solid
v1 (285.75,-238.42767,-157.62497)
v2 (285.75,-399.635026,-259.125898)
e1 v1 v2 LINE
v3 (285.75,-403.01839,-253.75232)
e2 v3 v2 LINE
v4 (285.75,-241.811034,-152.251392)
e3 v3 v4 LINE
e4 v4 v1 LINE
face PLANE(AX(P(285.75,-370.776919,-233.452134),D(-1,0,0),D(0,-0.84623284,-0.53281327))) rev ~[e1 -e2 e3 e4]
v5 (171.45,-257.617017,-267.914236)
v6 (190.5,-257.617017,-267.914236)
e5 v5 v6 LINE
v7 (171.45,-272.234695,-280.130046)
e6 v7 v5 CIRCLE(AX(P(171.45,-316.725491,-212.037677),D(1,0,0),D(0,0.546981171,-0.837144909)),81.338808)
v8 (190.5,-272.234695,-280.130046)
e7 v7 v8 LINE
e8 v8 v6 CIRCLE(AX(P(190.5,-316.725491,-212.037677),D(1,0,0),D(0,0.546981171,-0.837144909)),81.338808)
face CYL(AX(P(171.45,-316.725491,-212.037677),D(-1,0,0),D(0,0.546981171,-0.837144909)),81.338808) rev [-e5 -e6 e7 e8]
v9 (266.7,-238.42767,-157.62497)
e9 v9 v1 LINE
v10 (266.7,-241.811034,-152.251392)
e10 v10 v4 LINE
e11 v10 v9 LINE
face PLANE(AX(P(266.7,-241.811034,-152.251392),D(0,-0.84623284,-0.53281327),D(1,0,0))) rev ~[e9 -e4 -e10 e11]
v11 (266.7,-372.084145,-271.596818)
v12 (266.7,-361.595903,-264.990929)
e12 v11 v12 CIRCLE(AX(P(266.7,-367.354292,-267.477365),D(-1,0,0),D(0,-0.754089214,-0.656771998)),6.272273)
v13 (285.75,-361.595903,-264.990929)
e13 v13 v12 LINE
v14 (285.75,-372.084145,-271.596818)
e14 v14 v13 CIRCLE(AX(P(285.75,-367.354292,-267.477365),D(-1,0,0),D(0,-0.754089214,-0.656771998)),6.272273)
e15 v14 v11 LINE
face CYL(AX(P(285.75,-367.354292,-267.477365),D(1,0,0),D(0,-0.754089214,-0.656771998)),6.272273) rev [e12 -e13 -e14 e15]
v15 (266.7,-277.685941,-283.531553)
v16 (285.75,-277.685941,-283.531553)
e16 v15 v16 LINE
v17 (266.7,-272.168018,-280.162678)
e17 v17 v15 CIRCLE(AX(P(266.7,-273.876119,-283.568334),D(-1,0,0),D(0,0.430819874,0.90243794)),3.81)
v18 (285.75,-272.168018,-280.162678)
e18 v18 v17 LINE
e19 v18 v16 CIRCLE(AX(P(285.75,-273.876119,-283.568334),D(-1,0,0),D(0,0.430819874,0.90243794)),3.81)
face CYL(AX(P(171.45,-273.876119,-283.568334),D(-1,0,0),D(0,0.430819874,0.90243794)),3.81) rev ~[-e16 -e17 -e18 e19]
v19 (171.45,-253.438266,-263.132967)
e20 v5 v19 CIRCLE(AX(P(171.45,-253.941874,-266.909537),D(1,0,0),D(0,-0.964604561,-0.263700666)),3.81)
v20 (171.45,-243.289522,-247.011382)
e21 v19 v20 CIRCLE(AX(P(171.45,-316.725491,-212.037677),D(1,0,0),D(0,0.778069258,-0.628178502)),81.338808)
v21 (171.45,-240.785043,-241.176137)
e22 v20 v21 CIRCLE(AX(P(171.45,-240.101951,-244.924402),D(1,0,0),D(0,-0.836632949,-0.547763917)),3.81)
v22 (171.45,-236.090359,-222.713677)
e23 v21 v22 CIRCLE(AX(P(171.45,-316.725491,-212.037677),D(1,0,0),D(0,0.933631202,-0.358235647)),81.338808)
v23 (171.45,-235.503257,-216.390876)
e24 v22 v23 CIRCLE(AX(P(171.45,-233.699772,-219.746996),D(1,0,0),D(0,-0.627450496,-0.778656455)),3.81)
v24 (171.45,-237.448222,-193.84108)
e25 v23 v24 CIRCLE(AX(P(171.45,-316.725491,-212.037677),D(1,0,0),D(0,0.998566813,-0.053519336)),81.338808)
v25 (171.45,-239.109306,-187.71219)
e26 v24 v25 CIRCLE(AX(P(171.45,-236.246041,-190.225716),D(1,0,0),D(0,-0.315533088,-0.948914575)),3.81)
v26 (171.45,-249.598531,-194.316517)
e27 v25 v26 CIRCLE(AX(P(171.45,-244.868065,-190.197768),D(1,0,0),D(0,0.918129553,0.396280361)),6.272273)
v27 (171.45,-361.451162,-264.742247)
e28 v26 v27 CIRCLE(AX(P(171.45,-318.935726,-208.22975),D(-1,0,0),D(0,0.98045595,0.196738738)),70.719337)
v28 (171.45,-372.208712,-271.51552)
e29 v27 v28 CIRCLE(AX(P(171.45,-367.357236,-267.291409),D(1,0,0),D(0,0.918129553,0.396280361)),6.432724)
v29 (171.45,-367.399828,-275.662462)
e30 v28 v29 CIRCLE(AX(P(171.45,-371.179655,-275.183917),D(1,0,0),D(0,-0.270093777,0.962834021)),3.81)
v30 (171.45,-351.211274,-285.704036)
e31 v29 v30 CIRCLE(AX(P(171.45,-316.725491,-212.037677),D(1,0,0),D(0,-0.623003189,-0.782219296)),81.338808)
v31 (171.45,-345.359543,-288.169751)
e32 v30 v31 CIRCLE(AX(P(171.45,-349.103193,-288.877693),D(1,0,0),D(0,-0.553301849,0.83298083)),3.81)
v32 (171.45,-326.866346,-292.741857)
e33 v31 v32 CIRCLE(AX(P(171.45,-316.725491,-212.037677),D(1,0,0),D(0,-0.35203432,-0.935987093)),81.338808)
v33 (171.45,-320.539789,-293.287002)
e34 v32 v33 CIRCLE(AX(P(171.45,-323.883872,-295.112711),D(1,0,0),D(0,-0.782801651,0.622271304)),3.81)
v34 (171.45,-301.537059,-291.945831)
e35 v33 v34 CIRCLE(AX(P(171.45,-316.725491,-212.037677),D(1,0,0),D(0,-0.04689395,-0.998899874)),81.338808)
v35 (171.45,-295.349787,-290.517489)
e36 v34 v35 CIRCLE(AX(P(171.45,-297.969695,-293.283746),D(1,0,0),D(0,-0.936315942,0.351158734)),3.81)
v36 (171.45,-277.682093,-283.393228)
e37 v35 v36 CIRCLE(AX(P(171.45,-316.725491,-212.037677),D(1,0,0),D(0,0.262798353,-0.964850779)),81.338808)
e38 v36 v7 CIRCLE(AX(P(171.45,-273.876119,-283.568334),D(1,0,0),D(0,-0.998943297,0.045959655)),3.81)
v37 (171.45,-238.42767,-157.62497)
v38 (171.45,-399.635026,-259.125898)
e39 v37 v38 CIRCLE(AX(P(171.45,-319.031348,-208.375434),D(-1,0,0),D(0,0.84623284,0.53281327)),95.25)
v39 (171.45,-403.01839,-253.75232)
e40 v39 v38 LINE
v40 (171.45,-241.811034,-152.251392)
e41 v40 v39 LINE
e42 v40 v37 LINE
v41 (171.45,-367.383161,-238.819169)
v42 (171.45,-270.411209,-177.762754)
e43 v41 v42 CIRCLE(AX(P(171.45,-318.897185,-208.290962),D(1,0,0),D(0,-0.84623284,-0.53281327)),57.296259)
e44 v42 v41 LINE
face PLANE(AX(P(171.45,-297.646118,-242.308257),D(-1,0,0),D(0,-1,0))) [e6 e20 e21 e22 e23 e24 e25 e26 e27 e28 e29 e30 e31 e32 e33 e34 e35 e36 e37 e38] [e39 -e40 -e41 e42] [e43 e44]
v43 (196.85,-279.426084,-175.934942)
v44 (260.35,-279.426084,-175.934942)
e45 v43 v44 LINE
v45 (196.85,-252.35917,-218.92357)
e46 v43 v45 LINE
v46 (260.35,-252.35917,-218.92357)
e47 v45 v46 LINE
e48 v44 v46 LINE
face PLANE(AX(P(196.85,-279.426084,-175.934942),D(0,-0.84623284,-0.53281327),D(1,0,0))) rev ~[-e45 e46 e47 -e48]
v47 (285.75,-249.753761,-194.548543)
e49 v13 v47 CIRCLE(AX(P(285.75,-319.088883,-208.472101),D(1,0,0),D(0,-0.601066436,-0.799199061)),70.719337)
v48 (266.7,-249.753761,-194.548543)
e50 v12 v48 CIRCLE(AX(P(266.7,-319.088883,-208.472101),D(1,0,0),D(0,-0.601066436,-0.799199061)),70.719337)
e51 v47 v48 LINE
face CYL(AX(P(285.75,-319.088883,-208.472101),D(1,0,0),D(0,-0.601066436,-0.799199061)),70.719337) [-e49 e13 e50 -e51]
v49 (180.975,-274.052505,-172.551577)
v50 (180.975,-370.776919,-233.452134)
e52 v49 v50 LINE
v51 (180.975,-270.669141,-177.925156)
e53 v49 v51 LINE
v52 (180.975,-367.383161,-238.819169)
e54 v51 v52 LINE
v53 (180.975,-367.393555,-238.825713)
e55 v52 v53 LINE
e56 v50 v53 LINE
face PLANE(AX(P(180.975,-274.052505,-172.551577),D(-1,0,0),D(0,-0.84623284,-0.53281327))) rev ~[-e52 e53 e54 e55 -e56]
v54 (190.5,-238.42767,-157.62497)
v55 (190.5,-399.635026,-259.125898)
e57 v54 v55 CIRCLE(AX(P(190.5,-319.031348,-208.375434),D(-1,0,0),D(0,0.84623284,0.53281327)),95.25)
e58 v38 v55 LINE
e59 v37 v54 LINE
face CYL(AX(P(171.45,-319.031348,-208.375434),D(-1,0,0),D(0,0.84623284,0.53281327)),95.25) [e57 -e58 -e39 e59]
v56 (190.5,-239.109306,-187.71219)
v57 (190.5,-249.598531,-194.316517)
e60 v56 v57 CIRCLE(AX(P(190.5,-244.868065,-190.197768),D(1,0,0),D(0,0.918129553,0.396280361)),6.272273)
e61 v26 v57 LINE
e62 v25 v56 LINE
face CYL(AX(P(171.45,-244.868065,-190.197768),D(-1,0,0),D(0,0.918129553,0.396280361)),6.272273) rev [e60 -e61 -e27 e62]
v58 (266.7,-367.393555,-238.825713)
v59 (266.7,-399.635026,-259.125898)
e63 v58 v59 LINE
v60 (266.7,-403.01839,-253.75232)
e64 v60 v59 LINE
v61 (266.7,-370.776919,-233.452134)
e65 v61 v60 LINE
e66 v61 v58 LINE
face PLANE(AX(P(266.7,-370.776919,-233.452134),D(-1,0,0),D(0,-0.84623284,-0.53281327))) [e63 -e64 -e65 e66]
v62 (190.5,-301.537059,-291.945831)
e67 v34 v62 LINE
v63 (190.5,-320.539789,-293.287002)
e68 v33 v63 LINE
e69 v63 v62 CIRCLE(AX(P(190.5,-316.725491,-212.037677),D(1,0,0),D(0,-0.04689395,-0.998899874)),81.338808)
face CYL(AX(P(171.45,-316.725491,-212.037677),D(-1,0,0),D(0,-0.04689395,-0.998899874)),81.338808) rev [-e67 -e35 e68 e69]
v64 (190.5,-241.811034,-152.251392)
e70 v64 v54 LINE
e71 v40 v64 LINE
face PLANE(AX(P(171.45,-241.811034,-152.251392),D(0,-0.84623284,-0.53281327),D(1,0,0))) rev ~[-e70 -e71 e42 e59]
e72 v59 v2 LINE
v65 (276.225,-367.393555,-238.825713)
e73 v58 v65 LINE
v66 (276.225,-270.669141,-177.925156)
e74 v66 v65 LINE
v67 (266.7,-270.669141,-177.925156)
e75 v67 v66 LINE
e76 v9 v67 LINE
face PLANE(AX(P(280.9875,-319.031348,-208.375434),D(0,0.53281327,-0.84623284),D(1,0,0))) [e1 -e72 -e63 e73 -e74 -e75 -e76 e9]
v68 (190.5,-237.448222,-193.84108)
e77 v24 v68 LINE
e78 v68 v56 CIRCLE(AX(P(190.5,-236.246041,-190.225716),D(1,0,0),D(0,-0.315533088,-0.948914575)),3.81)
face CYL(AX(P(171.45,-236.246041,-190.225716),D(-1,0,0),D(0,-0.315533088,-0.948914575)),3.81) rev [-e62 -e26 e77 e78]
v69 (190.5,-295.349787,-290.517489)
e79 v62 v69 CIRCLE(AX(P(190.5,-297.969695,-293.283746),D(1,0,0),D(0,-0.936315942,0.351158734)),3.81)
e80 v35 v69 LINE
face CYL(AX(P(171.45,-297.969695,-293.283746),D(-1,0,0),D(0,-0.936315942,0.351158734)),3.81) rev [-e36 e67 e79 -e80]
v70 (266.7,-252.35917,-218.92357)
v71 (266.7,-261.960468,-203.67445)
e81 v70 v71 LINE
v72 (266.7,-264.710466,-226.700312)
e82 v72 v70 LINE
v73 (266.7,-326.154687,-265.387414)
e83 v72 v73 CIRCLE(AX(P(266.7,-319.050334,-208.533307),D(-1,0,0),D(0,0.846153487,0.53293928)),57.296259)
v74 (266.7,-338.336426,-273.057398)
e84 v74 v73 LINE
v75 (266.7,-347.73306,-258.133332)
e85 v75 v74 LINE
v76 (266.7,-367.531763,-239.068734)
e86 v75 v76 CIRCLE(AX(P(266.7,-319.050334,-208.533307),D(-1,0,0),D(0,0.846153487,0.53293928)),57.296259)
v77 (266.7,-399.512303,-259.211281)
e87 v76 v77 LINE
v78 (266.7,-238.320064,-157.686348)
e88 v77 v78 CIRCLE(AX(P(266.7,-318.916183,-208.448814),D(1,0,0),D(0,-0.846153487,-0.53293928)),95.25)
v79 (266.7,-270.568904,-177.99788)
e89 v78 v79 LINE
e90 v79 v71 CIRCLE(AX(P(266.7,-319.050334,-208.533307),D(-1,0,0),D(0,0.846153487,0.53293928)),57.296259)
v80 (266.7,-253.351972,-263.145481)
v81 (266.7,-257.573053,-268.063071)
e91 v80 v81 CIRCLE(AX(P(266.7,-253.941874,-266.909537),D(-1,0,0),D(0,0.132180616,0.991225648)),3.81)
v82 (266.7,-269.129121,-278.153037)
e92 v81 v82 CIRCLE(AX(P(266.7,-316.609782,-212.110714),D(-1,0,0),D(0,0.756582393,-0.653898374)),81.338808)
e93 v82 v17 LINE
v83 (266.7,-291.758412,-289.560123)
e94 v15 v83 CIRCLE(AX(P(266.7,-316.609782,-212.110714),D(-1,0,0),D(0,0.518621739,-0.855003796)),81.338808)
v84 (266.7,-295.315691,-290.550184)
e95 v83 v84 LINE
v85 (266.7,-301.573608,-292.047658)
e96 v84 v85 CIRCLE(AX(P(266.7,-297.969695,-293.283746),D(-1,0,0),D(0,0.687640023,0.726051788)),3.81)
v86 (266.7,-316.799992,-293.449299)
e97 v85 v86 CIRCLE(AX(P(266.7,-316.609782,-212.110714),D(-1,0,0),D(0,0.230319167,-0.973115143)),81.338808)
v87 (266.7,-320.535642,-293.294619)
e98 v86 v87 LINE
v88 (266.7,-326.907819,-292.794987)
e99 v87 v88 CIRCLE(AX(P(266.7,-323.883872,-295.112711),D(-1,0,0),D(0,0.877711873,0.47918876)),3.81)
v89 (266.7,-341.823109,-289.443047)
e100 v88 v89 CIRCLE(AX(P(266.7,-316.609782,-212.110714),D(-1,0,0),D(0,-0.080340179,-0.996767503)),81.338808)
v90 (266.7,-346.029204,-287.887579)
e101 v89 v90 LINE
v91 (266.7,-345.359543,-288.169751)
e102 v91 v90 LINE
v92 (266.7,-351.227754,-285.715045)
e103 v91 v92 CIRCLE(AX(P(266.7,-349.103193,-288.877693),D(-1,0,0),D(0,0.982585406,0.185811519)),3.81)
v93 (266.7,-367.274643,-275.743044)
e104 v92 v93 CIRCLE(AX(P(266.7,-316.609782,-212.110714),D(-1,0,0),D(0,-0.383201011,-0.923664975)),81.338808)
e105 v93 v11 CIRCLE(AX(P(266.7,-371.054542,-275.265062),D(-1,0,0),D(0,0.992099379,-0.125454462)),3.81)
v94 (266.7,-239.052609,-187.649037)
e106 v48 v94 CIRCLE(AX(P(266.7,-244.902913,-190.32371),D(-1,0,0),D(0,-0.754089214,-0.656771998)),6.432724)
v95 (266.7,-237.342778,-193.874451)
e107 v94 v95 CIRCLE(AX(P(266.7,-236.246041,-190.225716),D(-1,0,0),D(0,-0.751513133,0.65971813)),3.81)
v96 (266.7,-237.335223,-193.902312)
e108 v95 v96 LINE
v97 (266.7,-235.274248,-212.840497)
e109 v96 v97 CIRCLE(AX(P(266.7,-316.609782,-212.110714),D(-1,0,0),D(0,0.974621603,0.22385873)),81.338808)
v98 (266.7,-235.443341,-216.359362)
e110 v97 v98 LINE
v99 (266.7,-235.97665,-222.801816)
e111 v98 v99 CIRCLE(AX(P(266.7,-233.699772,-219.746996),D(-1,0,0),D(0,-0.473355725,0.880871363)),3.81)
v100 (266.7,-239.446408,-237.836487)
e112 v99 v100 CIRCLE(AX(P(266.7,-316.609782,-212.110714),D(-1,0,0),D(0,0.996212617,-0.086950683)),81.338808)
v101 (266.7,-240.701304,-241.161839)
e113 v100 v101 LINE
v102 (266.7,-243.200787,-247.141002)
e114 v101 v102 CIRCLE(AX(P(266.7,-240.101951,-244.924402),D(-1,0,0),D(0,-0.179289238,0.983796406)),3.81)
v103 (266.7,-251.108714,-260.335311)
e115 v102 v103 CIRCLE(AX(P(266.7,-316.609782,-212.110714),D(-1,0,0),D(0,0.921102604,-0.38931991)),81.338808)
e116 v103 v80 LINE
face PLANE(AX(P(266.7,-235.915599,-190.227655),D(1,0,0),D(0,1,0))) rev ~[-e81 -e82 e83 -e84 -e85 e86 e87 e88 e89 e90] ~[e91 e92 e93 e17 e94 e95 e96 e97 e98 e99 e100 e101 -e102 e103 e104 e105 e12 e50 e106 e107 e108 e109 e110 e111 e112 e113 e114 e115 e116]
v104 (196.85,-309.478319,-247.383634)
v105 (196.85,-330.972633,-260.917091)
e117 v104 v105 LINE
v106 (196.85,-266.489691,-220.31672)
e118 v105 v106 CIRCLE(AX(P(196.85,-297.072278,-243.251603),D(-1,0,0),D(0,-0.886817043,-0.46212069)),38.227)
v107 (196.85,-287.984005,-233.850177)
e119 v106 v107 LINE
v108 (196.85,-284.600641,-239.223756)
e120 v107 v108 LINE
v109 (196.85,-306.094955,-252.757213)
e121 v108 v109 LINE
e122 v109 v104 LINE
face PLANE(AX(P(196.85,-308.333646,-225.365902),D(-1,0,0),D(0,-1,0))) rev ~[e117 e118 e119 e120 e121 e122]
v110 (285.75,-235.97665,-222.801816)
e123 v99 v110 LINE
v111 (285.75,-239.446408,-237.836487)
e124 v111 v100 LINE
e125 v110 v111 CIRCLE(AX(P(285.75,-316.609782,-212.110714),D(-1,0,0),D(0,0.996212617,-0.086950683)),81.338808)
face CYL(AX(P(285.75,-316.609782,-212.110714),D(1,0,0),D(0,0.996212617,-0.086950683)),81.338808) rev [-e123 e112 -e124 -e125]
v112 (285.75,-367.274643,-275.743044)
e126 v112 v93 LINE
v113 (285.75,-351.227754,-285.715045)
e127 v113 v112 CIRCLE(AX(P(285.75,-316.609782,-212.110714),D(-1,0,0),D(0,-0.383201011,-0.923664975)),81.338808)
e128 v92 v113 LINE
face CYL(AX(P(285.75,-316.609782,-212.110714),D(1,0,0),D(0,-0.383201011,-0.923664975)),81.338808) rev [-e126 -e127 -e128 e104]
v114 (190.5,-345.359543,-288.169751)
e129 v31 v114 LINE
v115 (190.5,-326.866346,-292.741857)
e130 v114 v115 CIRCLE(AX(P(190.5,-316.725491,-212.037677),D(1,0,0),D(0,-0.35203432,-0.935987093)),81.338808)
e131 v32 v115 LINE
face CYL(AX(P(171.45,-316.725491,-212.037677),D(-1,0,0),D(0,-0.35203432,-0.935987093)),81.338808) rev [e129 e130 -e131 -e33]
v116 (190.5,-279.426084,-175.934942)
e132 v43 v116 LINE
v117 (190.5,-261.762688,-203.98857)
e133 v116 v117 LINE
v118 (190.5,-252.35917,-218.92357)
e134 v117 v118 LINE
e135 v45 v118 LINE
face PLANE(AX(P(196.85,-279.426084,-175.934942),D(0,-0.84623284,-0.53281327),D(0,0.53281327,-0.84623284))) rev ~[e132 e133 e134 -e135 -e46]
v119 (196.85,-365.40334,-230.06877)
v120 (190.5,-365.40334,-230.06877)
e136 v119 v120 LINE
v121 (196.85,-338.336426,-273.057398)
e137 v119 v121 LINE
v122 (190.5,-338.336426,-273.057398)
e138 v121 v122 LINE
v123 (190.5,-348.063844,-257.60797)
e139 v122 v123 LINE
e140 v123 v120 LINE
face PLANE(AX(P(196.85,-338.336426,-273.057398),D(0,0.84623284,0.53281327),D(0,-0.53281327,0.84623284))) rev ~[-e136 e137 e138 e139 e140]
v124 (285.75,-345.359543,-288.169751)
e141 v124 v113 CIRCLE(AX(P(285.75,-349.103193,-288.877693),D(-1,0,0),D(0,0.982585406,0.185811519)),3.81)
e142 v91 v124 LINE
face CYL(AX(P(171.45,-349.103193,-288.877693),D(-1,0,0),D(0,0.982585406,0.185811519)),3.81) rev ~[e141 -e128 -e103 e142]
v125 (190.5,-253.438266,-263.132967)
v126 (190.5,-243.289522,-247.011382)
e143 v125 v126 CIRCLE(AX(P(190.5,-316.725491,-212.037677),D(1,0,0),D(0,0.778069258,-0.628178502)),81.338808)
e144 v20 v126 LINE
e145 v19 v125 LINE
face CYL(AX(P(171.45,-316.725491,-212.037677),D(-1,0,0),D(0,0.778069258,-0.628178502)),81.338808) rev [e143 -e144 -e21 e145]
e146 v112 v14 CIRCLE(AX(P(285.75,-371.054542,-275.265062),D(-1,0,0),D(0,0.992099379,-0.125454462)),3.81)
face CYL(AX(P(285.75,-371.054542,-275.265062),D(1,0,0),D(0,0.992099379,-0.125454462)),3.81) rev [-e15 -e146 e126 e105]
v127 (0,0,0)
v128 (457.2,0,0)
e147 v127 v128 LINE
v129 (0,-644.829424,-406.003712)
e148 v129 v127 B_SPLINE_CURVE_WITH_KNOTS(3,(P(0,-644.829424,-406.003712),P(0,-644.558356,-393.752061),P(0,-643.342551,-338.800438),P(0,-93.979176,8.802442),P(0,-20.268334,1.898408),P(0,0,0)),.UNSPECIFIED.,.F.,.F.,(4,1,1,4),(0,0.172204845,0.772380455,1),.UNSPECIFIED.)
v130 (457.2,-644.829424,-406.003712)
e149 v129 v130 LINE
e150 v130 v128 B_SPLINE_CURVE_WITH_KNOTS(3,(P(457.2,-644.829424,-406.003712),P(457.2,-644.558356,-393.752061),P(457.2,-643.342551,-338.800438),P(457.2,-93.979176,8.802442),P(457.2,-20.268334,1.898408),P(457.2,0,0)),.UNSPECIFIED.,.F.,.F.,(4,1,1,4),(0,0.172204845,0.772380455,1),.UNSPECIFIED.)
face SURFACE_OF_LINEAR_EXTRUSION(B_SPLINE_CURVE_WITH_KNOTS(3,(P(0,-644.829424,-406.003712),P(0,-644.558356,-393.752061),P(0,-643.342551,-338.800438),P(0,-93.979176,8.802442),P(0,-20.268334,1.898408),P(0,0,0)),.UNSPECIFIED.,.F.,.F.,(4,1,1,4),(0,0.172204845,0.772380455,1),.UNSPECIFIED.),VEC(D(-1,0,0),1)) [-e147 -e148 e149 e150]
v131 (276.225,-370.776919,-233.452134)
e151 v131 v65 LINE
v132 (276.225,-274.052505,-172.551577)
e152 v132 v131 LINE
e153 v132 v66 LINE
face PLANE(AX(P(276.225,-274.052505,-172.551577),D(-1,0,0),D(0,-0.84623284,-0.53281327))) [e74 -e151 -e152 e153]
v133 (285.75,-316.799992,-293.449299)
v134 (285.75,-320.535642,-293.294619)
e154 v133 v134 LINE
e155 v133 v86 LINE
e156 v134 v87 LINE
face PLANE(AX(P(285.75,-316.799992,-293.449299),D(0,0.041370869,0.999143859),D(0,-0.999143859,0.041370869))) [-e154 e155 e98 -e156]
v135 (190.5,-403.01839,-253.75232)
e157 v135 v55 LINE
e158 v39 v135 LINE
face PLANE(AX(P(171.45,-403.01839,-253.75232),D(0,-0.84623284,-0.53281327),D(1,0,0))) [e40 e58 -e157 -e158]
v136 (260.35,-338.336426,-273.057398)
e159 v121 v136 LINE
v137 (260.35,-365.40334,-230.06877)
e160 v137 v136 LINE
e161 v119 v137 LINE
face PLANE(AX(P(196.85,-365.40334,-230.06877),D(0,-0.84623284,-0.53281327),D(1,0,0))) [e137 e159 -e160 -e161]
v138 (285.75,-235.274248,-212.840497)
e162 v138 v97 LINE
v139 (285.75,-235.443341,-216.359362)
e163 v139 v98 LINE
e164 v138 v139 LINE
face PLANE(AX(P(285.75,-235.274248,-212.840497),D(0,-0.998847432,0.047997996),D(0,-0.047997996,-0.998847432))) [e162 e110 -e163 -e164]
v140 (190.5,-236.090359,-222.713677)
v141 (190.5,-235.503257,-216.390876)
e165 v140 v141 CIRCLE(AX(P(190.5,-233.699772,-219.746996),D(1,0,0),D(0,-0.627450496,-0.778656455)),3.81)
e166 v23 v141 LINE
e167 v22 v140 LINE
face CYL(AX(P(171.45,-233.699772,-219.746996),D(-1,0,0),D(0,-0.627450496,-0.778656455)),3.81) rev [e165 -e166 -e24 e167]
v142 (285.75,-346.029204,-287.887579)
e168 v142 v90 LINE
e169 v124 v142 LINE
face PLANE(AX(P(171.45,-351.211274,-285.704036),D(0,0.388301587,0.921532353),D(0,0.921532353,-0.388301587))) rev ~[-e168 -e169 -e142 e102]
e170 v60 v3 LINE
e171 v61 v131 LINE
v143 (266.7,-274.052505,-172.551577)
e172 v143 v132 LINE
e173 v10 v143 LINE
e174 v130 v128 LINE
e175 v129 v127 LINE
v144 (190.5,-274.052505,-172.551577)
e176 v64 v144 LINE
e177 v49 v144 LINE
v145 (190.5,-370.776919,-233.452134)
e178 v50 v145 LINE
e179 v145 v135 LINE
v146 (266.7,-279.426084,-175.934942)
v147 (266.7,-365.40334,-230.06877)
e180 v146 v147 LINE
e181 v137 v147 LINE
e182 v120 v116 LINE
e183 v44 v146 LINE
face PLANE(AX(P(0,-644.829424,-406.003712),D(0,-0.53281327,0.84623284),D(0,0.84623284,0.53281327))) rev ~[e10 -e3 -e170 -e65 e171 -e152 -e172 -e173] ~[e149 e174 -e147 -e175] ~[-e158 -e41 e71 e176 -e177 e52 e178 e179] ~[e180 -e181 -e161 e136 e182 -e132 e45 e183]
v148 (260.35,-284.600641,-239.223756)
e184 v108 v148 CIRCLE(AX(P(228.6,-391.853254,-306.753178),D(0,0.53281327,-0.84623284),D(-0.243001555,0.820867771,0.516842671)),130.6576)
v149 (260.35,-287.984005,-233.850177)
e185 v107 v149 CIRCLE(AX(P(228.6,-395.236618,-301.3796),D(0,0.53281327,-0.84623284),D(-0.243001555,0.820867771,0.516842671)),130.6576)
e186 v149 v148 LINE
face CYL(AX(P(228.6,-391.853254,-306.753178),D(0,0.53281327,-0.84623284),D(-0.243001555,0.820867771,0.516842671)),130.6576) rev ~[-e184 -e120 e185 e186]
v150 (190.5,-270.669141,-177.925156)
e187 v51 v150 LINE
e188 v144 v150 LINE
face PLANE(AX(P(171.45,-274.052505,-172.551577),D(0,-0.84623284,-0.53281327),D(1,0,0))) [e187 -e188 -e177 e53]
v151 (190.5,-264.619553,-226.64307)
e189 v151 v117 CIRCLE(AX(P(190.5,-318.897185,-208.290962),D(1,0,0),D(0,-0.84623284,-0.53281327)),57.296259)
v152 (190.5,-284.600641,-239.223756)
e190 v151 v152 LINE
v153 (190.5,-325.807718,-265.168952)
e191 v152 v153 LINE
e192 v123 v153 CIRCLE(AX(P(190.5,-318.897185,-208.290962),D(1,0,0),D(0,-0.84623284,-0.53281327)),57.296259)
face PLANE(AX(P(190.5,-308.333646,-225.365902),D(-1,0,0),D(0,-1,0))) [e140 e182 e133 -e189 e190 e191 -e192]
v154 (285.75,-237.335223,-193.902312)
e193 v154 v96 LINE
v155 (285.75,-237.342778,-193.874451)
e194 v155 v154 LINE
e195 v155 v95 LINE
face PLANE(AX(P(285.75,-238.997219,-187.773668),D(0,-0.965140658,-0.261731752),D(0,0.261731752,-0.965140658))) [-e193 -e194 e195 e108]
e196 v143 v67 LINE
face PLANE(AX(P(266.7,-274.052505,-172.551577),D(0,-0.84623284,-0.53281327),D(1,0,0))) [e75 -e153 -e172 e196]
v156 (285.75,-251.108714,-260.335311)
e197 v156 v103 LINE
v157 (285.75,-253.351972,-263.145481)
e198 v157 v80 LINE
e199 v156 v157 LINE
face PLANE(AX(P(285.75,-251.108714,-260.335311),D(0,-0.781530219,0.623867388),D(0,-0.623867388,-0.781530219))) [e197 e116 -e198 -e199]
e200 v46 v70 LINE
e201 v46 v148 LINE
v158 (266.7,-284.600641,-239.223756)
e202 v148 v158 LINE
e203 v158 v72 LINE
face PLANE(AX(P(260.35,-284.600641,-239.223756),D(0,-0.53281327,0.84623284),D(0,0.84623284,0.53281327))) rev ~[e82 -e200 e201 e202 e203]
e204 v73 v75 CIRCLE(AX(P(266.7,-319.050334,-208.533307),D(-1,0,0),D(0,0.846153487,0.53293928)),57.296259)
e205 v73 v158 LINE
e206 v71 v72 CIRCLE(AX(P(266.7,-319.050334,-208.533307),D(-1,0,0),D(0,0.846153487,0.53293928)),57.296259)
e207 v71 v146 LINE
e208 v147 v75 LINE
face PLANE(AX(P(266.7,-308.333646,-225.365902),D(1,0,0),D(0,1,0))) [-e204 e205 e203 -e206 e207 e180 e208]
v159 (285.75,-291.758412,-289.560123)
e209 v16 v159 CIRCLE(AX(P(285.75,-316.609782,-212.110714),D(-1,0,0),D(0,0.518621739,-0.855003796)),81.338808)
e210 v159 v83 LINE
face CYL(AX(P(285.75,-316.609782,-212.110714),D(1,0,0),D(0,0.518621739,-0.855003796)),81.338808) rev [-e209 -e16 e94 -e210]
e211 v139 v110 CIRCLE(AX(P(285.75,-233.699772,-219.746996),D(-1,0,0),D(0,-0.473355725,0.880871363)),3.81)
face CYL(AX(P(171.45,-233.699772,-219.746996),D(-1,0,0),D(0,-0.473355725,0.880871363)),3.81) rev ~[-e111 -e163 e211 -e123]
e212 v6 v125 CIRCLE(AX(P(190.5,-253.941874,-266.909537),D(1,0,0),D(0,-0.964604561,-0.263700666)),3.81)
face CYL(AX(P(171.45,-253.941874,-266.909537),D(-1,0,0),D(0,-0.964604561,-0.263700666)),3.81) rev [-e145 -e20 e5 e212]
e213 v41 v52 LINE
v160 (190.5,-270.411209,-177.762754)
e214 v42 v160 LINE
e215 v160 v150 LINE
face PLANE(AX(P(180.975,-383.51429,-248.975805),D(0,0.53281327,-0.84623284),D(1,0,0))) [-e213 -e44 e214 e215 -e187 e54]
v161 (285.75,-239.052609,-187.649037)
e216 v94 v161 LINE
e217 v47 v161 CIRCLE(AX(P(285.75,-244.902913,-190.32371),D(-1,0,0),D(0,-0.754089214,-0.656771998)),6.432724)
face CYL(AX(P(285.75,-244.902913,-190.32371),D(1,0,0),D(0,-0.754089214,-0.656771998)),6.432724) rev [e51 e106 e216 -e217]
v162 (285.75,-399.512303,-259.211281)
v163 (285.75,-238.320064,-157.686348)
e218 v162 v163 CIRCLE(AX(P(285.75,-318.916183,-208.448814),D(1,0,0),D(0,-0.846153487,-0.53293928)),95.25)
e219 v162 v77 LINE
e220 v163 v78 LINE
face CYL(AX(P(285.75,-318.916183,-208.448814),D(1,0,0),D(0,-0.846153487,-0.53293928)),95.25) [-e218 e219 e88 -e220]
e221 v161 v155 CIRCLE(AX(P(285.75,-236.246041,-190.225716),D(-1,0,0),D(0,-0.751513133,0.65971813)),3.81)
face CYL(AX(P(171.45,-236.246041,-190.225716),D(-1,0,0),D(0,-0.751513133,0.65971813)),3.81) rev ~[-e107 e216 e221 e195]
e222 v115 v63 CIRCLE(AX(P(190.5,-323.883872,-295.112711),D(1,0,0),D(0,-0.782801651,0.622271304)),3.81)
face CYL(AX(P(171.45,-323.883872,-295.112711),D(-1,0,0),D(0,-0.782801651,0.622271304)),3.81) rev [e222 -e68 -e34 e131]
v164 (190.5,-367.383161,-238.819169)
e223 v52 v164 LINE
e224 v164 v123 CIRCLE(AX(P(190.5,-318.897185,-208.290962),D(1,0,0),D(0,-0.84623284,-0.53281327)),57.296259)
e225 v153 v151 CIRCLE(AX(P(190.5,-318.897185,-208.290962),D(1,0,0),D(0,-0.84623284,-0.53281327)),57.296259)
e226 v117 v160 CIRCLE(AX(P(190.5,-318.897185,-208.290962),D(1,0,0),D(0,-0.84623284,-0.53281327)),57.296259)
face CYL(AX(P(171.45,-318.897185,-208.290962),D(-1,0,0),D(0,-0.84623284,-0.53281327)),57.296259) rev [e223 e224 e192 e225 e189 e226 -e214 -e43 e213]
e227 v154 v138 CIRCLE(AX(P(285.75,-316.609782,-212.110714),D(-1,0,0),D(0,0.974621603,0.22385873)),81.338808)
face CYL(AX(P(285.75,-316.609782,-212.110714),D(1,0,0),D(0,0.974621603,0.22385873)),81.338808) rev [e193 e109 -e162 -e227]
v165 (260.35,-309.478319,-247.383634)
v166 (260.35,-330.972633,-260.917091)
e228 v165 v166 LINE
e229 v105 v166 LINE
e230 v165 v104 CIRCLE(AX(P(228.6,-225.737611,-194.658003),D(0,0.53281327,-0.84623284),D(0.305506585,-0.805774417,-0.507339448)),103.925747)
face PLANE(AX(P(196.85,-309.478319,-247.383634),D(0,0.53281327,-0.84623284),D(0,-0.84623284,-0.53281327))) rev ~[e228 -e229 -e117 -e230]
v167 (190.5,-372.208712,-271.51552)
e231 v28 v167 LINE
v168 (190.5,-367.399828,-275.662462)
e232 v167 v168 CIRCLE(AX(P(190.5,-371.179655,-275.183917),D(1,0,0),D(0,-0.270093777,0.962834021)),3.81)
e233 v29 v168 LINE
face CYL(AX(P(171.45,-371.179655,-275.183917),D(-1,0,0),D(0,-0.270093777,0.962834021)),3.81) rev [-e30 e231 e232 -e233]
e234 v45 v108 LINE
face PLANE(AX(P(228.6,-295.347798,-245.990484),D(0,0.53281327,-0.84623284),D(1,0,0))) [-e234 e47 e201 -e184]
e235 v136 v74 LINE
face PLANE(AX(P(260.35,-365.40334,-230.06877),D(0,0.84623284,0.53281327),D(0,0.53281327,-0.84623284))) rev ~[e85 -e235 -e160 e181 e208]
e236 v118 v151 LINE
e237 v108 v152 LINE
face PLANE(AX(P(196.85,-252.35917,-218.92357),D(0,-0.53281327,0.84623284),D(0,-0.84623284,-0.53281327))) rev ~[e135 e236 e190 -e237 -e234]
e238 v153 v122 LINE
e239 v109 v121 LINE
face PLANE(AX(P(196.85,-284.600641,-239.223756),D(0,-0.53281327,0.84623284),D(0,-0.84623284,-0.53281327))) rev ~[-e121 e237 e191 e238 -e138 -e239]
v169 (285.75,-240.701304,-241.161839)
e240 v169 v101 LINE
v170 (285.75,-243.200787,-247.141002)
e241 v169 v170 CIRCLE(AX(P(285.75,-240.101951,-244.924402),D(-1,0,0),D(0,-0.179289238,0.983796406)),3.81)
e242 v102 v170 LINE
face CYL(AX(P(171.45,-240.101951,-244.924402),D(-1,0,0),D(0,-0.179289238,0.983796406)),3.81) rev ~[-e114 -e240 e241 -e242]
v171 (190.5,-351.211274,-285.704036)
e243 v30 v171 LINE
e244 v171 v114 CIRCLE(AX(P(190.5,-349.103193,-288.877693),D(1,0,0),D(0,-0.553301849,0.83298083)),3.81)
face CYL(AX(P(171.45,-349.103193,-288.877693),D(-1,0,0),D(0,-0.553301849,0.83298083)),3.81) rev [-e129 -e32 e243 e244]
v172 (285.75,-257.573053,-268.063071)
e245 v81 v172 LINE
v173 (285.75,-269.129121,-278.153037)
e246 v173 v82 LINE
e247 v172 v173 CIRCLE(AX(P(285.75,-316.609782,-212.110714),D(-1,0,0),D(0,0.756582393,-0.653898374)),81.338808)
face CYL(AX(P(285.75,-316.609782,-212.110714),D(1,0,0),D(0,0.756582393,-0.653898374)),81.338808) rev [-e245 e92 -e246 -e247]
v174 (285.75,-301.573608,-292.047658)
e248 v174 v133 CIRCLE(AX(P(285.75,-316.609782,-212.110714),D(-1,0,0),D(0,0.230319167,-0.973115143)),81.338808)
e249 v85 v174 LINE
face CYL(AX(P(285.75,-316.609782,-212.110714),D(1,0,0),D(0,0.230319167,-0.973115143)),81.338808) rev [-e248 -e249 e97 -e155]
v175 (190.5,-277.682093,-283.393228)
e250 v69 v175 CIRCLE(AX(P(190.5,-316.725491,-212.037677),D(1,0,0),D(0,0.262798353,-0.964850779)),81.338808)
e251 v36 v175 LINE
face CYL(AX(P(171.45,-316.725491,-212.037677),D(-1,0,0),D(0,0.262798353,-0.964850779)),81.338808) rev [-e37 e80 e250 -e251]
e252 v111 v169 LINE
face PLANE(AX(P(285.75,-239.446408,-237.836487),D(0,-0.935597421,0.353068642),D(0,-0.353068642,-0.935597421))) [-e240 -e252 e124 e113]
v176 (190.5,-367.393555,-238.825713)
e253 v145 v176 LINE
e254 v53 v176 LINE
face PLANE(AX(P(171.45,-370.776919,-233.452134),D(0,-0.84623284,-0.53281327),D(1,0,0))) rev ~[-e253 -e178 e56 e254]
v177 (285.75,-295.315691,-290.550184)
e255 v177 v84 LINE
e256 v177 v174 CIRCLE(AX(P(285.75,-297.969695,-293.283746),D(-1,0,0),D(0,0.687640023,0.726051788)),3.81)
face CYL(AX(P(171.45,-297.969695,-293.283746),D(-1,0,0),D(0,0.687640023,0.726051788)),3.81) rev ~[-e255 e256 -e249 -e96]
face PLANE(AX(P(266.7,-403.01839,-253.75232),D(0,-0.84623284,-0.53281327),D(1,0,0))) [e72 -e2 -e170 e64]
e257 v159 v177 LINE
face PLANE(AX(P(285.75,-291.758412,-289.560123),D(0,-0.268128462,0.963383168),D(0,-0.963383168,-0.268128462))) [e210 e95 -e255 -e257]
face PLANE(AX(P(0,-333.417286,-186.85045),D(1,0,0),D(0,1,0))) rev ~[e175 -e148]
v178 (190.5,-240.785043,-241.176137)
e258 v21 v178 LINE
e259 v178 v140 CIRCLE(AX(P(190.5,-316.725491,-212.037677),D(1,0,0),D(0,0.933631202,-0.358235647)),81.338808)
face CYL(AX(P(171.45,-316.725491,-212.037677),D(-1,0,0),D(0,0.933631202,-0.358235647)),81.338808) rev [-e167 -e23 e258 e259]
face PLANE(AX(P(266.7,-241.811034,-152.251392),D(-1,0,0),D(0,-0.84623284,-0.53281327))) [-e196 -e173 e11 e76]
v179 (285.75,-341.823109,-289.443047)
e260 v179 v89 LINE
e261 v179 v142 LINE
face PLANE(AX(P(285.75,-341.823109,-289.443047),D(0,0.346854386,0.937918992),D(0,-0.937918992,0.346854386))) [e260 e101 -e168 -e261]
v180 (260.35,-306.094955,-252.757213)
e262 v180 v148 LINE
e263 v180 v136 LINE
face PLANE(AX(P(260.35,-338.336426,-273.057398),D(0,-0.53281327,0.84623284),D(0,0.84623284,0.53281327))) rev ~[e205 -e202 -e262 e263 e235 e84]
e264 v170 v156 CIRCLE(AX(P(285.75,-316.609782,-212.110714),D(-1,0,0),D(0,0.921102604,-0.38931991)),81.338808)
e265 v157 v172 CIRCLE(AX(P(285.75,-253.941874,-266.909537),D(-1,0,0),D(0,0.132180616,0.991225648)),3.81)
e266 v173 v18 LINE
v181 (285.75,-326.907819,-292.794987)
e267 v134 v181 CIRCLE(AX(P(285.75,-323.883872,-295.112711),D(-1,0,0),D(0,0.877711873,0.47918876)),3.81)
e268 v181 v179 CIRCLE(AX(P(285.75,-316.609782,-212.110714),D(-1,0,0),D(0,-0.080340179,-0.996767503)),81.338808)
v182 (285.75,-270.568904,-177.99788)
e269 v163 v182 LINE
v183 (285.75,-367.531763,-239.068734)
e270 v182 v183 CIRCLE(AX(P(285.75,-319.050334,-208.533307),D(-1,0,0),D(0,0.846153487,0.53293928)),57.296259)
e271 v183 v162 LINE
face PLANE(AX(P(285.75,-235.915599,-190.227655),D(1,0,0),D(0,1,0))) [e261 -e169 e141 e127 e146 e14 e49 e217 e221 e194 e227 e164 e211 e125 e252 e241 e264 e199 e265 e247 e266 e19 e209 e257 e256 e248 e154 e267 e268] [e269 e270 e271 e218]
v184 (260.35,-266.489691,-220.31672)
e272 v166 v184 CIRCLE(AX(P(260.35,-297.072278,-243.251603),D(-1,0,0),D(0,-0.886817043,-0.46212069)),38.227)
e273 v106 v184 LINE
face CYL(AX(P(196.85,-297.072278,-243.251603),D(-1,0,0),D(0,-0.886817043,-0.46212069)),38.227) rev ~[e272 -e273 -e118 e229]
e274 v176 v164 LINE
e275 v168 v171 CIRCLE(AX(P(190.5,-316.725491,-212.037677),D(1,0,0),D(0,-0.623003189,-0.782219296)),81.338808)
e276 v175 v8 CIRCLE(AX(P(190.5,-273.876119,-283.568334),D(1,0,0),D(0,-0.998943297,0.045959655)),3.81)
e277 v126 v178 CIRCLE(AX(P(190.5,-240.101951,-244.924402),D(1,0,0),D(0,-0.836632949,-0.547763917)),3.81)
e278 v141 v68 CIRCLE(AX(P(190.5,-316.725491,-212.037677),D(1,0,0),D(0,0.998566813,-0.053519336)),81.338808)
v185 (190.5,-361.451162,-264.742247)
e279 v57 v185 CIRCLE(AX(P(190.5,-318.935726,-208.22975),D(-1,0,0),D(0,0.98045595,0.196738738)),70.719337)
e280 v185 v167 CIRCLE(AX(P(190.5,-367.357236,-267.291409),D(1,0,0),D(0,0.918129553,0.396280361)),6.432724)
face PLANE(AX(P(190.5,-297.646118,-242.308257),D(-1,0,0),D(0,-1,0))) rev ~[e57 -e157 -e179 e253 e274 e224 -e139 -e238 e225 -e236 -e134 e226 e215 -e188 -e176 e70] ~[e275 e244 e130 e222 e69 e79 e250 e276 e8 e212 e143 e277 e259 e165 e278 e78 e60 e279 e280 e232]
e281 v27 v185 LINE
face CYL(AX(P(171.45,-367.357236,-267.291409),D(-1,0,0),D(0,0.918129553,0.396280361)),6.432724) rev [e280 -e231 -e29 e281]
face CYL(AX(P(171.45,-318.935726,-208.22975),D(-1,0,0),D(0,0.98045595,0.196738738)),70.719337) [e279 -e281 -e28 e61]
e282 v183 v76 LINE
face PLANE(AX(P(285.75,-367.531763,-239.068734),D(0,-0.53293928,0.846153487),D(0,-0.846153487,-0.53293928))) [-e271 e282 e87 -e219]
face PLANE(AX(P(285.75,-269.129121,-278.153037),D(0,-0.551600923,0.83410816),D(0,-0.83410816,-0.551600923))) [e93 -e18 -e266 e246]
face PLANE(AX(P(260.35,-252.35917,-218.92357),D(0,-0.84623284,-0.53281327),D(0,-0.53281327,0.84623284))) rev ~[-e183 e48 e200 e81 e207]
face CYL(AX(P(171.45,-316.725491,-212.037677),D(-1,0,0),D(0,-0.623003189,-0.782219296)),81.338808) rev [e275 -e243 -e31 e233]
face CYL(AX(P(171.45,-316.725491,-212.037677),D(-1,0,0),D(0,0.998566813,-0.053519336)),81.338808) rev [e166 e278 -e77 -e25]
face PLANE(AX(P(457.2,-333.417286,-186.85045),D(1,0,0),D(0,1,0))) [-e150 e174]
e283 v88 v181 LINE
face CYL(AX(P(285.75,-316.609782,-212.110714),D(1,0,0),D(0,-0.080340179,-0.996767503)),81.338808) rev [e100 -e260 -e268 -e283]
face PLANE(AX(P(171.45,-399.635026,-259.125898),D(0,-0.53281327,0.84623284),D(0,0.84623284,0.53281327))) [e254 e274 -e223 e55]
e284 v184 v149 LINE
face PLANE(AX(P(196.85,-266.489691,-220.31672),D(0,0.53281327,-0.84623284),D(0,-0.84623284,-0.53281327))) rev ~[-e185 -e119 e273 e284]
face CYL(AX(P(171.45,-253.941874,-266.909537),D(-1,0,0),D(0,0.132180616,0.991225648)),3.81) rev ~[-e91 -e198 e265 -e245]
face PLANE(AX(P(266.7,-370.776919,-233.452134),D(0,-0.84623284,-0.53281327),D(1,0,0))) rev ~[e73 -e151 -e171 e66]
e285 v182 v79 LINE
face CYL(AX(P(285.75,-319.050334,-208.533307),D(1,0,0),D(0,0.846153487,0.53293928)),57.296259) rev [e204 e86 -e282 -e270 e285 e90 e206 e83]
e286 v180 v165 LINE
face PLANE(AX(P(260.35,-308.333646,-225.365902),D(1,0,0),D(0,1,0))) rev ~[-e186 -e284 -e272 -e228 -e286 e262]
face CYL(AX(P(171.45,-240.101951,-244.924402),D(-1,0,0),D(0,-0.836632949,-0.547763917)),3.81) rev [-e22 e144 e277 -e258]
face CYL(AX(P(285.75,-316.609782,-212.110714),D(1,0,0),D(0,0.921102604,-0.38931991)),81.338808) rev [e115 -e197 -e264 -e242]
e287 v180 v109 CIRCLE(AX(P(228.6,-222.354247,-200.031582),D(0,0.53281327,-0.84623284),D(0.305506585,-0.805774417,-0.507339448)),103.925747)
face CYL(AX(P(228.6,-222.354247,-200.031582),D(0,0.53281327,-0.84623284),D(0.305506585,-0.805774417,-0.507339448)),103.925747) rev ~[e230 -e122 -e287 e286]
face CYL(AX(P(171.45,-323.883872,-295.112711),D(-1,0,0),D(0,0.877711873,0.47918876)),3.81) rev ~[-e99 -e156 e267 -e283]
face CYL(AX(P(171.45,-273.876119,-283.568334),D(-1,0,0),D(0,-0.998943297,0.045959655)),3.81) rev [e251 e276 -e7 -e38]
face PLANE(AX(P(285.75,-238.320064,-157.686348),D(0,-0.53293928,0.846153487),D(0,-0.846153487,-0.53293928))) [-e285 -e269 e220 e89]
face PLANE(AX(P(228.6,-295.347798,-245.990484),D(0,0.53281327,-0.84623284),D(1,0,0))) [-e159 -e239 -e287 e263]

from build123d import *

# Parameters (mm, degrees)
F1_DEPTH  = 457.2
F2_W      = 63.5
F2_H      = 101.6
F3_DEPTH  = 50.8
F5_DEPTH  = 127
F7_DEPTH  = 6.35
F9_DEPTH  = 6.35
F11_DEPTH = 7.62
F12_W     = 19.05
F12_H     = 38.1
F13_DEPTH = 6.35
F14_W     = 9.525
F14_H     = 114.3
F15_DEPTH = 6.35
F17_DEPTH = 19.05
F19_DEPTH = 19.05
F21_DEPTH = 19.05
F23_DEPTH = 127


with BuildPart() as f1:
    # F0 (on Right) → F1 (new body)
    with BuildSketch(Plane.YZ):
        with BuildLine():
            Line((-644.8294241484, -406.0037115008), (0, 0))
            add(Edge.make_bspline(
                [(-644.8294241484, -406.0037115008), (-644.5583562129, -393.7520607079), (-643.3425508393, -338.8004381801), (-93.9791762847, 8.8024420181), (-20.2683336801, 1.8984081269), (0, 0)],
                knots=[0, 0, 0, 0, 0.1722048446, 0.7723804554, 1, 1, 1, 1], degree=3))
        make_face()
    extrude(amount=F1_DEPTH)

    # F2 (on face) → F3 (join)
    with BuildSketch(Plane(origin=(0, 0, 0), x_dir=(1, 0, 0), z_dir=(0, 0.5328132697, -0.8462328401))):
        with Locations((228.6, 381)):
            Rectangle(F2_W, F2_H)
    extrude(amount=F3_DEPTH)

    # F4 (on face) → F5 (cut)
    with BuildSketch(Plane(origin=(196.85, 0, 0), x_dir=(0, -1, 0), z_dir=(-1, 0, 0))):
        with BuildLine():
            Line((287.9840051675, -233.8501769674), (284.600640905, -239.223755502))
            Line((284.600640905, -239.223755502), (306.0949550433, -252.757212552))
            Line((306.0949550433, -252.757212552), (309.4783193058, -247.3836340174))
            Line((309.4783193058, -247.3836340174), (330.9726334441, -260.9170910675))
            ThreePointArc((330.9726334441, -260.9170910675), (317.4401312079, -210.9026606557), (266.4896910292, -220.3167199174))
            Line((266.4896910292, -220.3167199174), (287.9840051675, -233.8501769674))
        make_face()
    extrude(amount=-F5_DEPTH, mode=Mode.SUBTRACT)

    # F6 (on face) → F7 (join)
    with BuildSketch(Plane(origin=(196.85, 0, 0), x_dir=(0, -1, 0), z_dir=(-1, 0, 0))):
        with BuildLine():
            Line((252.3591696976, -218.9235699269), (284.600640905, -239.223755502))
            Line((284.600640905, -239.223755502), (287.9840051675, -233.8501769674))
            Line((287.9840051675, -233.8501769674), (266.4896910292, -220.3167199174))
            ThreePointArc((266.4896910292, -220.3167199174), (317.4401312079, -210.9026606557), (330.9726334441, -260.9170910675))
            Line((330.9726334441, -260.9170910675), (309.4783193058, -247.3836340174))
            Line((309.4783193058, -247.3836340174), (306.0949550433, -252.757212552))
            Line((306.0949550433, -252.757212552), (338.3364262507, -273.057398127))
            Line((338.3364262507, -273.057398127), (365.4033403508, -230.0687698505))
            Line((365.4033403508, -230.0687698505), (279.4260837976, -175.9349416504))
            Line((279.4260837976, -175.9349416504), (252.3591696976, -218.9235699269))
        make_face()
        with BuildLine():
            Line((287.9840051675, -233.8501769674), (284.600640905, -239.223755502))
            Line((284.600640905, -239.223755502), (306.0949550433, -252.757212552))
            Line((306.0949550433, -252.757212552), (309.4783193058, -247.3836340174))
            Line((309.4783193058, -247.3836340174), (330.9726334441, -260.9170910675))
            ThreePointArc((330.9726334441, -260.9170910675), (317.4401312079, -210.9026606557), (266.4896910292, -220.3167199174))
            Line((266.4896910292, -220.3167199174), (287.9840051675, -233.8501769674))
        make_face()
    extrude(amount=F7_DEPTH)

    # F8 (on face) → F9 (join)
    with BuildSketch(Plane.YZ.offset(260.35)):
        with BuildLine():
            Line((-338.3364262507, -273.057398127), (-306.0949550433, -252.757212552))
            Line((-306.0949550433, -252.757212552), (-309.4783193058, -247.3836340174))
            Line((-309.4783193058, -247.3836340174), (-330.9726334441, -260.9170910675))
            ThreePointArc((-330.9726334441, -260.9170910675), (-317.4401312079, -210.9026606557), (-266.4896910292, -220.3167199174))
            Line((-266.4896910292, -220.3167199174), (-287.9840051675, -233.8501769674))
            Line((-287.9840051675, -233.8501769674), (-284.600640905, -239.223755502))
            Line((-284.600640905, -239.223755502), (-252.3591696976, -218.9235699269))
            Line((-252.3591696976, -218.9235699269), (-279.4260837976, -175.9349416504))
            Line((-279.4260837976, -175.9349416504), (-365.4033403508, -230.0687698505))
            Line((-365.4033403508, -230.0687698505), (-338.3364262507, -273.057398127))
        make_face()
        with BuildLine():
            Line((-309.4783193058, -247.3836340174), (-306.0949550433, -252.757212552))
            Line((-306.0949550433, -252.757212552), (-284.600640905, -239.223755502))
            Line((-284.600640905, -239.223755502), (-287.9840051675, -233.8501769674))
            Line((-287.9840051675, -233.8501769674), (-266.4896910292, -220.3167199174))
            ThreePointArc((-266.4896910292, -220.3167199174), (-317.4401312079, -210.9026606557), (-330.9726334441, -260.9170910675))
            Line((-330.9726334441, -260.9170910675), (-309.4783193058, -247.3836340174))
        make_face()
    extrude(amount=F9_DEPTH)

    # F10 (on face) → F11 (cut)
    with BuildSketch(Plane(origin=(0, 27.0669141001, -42.9886282766), x_dir=(1, 0, 0), z_dir=(0, 0.5328132697, -0.8462328401))):
        with BuildLine():
            Line((260.35, 368.3), (196.85, 368.3))
            ThreePointArc((196.85, 368.3), (228.6, 364.3836558631), (260.35, 368.3))
        make_face()
        with BuildLine():
            ThreePointArc((260.35, 393.7), (228.6, 398.6686937584), (196.85, 393.7))
            Line((196.85, 393.7), (260.35, 393.7))
        make_face()
    extrude(amount=-F11_DEPTH, mode=Mode.SUBTRACT)

    # F12 (on face) → F13 (join)
    with BuildSketch(Plane(origin=(0, 0, 0), x_dir=(1, 0, 0), z_dir=(0, 0.5328132697, -0.8462328401))):
        with Locations((276.225, 304.8)):
            Rectangle(F12_W, F12_H)
        with Locations((180.975, 304.8)):
            Rectangle(F12_W, F12_H)
        with Locations((180.975, 457.2)):
            Rectangle(F12_W, F12_H)
        with Locations((276.225, 457.2)):
            Rectangle(F12_W, F12_H)
    extrude(amount=F13_DEPTH)

    # F14 (on face) → F15 (join)
    with BuildSketch(Plane(origin=(0, 0, 0), x_dir=(1, 0, 0), z_dir=(0, 0.5328132697, -0.8462328401))):
        with Locations((280.9875, 381)):
            Rectangle(F14_W, F14_H)
        with Locations((176.2125, 381)):
            Rectangle(F14_W, F14_H)
    extrude(amount=F15_DEPTH)

    # F16 (on face) → F17 (join, through all)
    with BuildSketch(Plane(origin=(171.45, 0, 0), x_dir=(0, -1, 0), z_dir=(-1, 0, 0))):
        with BuildLine():
            ThreePointArc((367.3831611706, -238.8191686221), (288.3689781086, -256.7769374998), (270.4112092309, -177.7627544378))
            Line((270.4112092309, -177.7627544378), (238.4276697931, -157.6249703474))
            ThreePointArc((238.4276697931, -157.6249703474), (268.2808838741, -288.9791123035), (399.6350258302, -259.1258982226))
            Line((399.6350258302, -259.1258982226), (367.3831611706, -238.8191686221))
        make_face()
        with BuildLine():
            ThreePointArc((239.1093056989, -187.7121895128), (248.2100145695, -184.8899649175), (249.5985309983, -194.3165165532))
            ThreePointArc((249.5985309983, -194.3165165532), (281.2555246608, -268.0747753287), (361.4511619568, -264.7422471567))
            ThreePointArc((361.4511619568, -264.7422471567), (370.7846763643, -261.84782714), (372.2087124782, -271.5155197072))
            ThreePointArc((372.2087124782, -271.5155197072), (373.6678203851, -278.069248149), (367.3998277743, -275.6624617016))
            ThreePointArc((367.3998277743, -275.6624617016), (359.600539495, -281.1588159356), (351.2112735384, -285.7040358686))
            ThreePointArc((351.2112735384, -285.7040358686), (350.5826225392, -292.3887310968), (345.3595430971, -288.1697509458))
            ThreePointArc((345.3595430971, -288.1697509458), (336.2472580827, -290.999074071), (326.8663458105, -292.7418570382))
            ThreePointArc((326.8663458105, -292.7418570382), (324.2109582174, -298.908644622), (320.5397892842, -293.2870015315))
            ThreePointArc((320.5397892842, -293.2870015315), (310.9990248614, -293.1746549338), (301.5370588891, -291.9458313221))
            ThreePointArc((301.5370588891, -291.9458313221), (297.1126896264, -296.9961094334), (295.3497866634, -290.5174887842))
            ThreePointArc((295.3497866634, -290.5174887842), (286.3066520823, -287.4743777976), (277.6820927997, -283.3932278725))
            ThreePointArc((277.6820927997, -283.3932278725), (271.9182094781, -286.8367727653), (272.2346951196, -280.1300456044))
            ThreePointArc((272.2346951196, -280.1300456044), (264.5669953666, -274.4515609449), (257.6170172155, -267.9142364747))
            ThreePointArc((257.6170172155, -267.9142364747), (251.0731122849, -269.416787849), (253.4382656928, -263.1329672174))
            ThreePointArc((253.4382656928, -263.1329672174), (247.8902941341, -255.370311801), (243.2895222041, -247.011382134))
            ThreePointArc((243.2895222041, -247.011382134), (236.6008037693, -246.4270893363), (240.7850426635, -241.1761373036))
            ThreePointArc((240.7850426635, -241.1761373036), (237.8953334828, -232.0828217157), (236.0903585556, -222.713676982))
            ThreePointArc((236.0903585556, -222.713676982), (229.9060915749, -220.0992565331), (235.5032574787, -216.3908759946))
            ThreePointArc((235.5032574787, -216.3908759946), (235.6875620889, -205.0479961951), (237.4482217292, -193.8410801176))
            ThreePointArc((237.4482217292, -193.8410801176), (232.5687062994, -189.2290652061), (239.1093056989, -187.7121895128))
        make_face(mode=Mode.SUBTRACT)
    extrude(amount=-F17_DEPTH)

    # F18 (on face) → F19 (join)
    with BuildSketch(Plane.YZ.offset(285.75)):
        with BuildLine():
            ThreePointArc((-270.5689041654, -177.9978801358), (-288.5149065441, -257.0147364807), (-367.5317628891, -239.068734102))
            Line((-367.5317628891, -239.068734102), (-399.5123031789, -259.2112807586))
            ThreePointArc((-399.5123031789, -259.2112807586), (-268.1537171245, -289.044934068), (-238.320063815, -157.6863480136))
            Line((-238.320063815, -157.6863480136), (-270.5689041654, -177.9978801358))
        make_face()
        with BuildLine():
            ThreePointArc((-372.0841451457, -271.5968179501), (-370.6970324756, -262.1700596497), (-361.5959034378, -264.9909289928))
            ThreePointArc((-361.5959034378, -264.9909289928), (-281.3997707716, -268.3115148932), (-249.7537610805, -194.5485427732))
            ThreePointArc((-249.7537610805, -194.5485427732), (-248.331164635, -184.8806382546), (-238.997219312, -187.7736683504))
            ThreePointArc((-238.997219312, -187.7736683504), (-232.4563941014, -189.2895700416), (-237.3352226845, -193.902311529))
            ThreePointArc((-237.3352226845, -193.902311529), (-235.7483929759, -203.310859717), (-235.2742480634, -212.8404973875))
            ThreePointArc((-235.2742480634, -212.8404973875), (-229.5174036152, -216.2957968495), (-235.5790353354, -219.1831785807))
            ThreePointArc((-235.5790353354, -219.1831785807), (-236.9647482072, -228.6234437977), (-239.4464083444, -237.8364872955))
            ThreePointArc((-239.4464083444, -237.8364872955), (-235.0323538545, -242.895783228), (-241.6883942228, -243.7775309177))
            ThreePointArc((-241.6883942228, -243.7775309177), (-245.9121403787, -252.3331592372), (-251.1087141332, -260.3353107443))
            ThreePointArc((-251.1087141332, -260.3353107443), (-248.4659159709, -266.5075040536), (-255.0702720454, -265.2980276321))
            ThreePointArc((-255.0702720454, -265.2980276321), (-261.7220580916, -272.1385356487), (-269.1291209948, -278.1530370143))
            ThreePointArc((-269.1291209948, -278.1530370143), (-268.5141120454, -284.8390011456), (-274.4257078095, -281.6557028726))
            ThreePointArc((-274.4257078095, -281.6557028726), (-282.8598537654, -286.1170916164), (-291.7584121219, -289.560123232))
            ThreePointArc((-291.7584121219, -289.560123232), (-293.230890482, -296.1108605838), (-297.8758952364, -291.2627389678))
            ThreePointArc((-297.8758952364, -291.2627389678), (-307.2737098275, -292.9119473966), (-316.7999924715, -293.4492987853))
            ThreePointArc((-316.7999924715, -293.4492987853), (-320.2170266349, -299.2289380388), (-323.1445559768, -293.1865937648))
            ThreePointArc((-323.1445559768, -293.1865937648), (-332.5938059019, -291.8635354209), (-341.8231093104, -289.4430466017))
            ThreePointArc((-341.8231093104, -289.4430466017), (-346.8530123381, -293.8905658996), (-347.7788949072, -287.24052125))
            ThreePointArc((-347.7788949072, -287.24052125), (-357.928637458, -282.1732126459), (-367.2746429584, -275.7430437893))
            ThreePointArc((-367.2746429584, -275.7430437893), (-373.542277096, -278.1507636005), (-372.0841451457, -271.5968179501))
        make_face(mode=Mode.SUBTRACT)
    extrude(amount=-F19_DEPTH)

    # F20 (on face) → F21 (join)
    with BuildSketch(Plane.YZ.offset(285.75)):
        with BuildLine():
            ThreePointArc((-237.3352226845, -193.902311529), (-232.4563941014, -189.2895700416), (-238.997219312, -187.7736683504))
            Line((-238.997219312, -187.7736683504), (-237.3352226845, -193.902311529))
        make_face()
        with BuildLine():
            ThreePointArc((-235.5790353354, -219.1831785807), (-229.5174036152, -216.2957968495), (-235.2742480634, -212.8404973875))
            Line((-235.2742480634, -212.8404973875), (-235.5790353354, -219.1831785807))
        make_face()
        with BuildLine():
            ThreePointArc((-241.6883942228, -243.7775309177), (-235.0323538545, -242.895783228), (-239.4464083444, -237.8364872955))
            Line((-239.4464083444, -237.8364872955), (-241.6883942228, -243.7775309177))
        make_face()
        with BuildLine():
            ThreePointArc((-255.0702720454, -265.2980276321), (-248.4659159709, -266.5075040536), (-251.1087141332, -260.3353107443))
            Line((-251.1087141332, -260.3353107443), (-255.0702720454, -265.2980276321))
        make_face()
        with BuildLine():
            ThreePointArc((-274.4257078095, -281.6557028726), (-268.5141120454, -284.8390011456), (-269.1291209948, -278.1530370143))
            Line((-269.1291209948, -278.1530370143), (-274.4257078095, -281.6557028726))
        make_face()
        with BuildLine():
            Line((-291.7584121219, -289.560123232), (-297.8758952364, -291.2627389678))
            ThreePointArc((-297.8758952364, -291.2627389678), (-293.230890482, -296.1108605838), (-291.7584121219, -289.560123232))
        make_face()
        with BuildLine():
            Line((-316.7999924715, -293.4492987853), (-323.1445559768, -293.1865937648))
            ThreePointArc((-323.1445559768, -293.1865937648), (-320.2170266349, -299.2289380388), (-316.7999924715, -293.4492987853))
        make_face()
        with BuildLine():
            Line((-341.8231093104, -289.4430466017), (-347.7788949072, -287.24052125))
            ThreePointArc((-347.7788949072, -287.24052125), (-346.8530123381, -293.8905658996), (-341.8231093104, -289.4430466017))
        make_face()
    extrude(amount=-F21_DEPTH)

    # F22 (on face) → F23 (cut)
    with BuildSketch(Plane(origin=(171.45, 0, 0), x_dir=(0, -1, 0), z_dir=(-1, 0, 0))):
        with BuildLine():
            ThreePointArc((345.3595430971, -288.1697509458), (350.5826225392, -292.3887310968), (351.2112735384, -285.7040358686))
            Line((351.2112735384, -285.7040358686), (345.3595430971, -288.1697509458))
        make_face()
        with BuildLine():
            ThreePointArc((320.5397892842, -293.2870015315), (324.2109582174, -298.908644622), (326.8663458105, -292.7418570382))
            Line((326.8663458105, -292.7418570382), (320.5397892842, -293.2870015315))
        make_face()
        with BuildLine():
            ThreePointArc((295.3497866634, -290.5174887842), (297.1126896264, -296.9961094334), (301.5370588891, -291.9458313221))
            Line((301.5370588891, -291.9458313221), (295.3497866634, -290.5174887842))
        make_face()
        with BuildLine():
            ThreePointArc((272.2346951196, -280.1300456044), (271.9182094781, -286.8367727653), (277.6820927997, -283.3932278725))
            Line((277.6820927997, -283.3932278725), (272.2346951196, -280.1300456044))
        make_face()
        with BuildLine():
            ThreePointArc((253.4382656928, -263.1329672174), (251.0731122849, -269.416787849), (257.6170172155, -267.9142364747))
            Line((257.6170172155, -267.9142364747), (253.4382656928, -263.1329672174))
        make_face()
        with BuildLine():
            Line((243.2895222041, -247.011382134), (240.7850426635, -241.1761373036))
            ThreePointArc((240.7850426635, -241.1761373036), (236.6008037693, -246.4270893363), (243.2895222041, -247.011382134))
        make_face()
        with BuildLine():
            Line((236.0903585556, -222.713676982), (235.5032574787, -216.3908759946))
            ThreePointArc((235.5032574787, -216.3908759946), (229.9060915749, -220.0992565331), (236.0903585556, -222.713676982))
        make_face()
        with BuildLine():
            Line((237.4482217292, -193.8410801176), (239.1093056989, -187.7121895128))
            ThreePointArc((239.1093056989, -187.7121895128), (232.5687062994, -189.2290652061), (237.4482217292, -193.8410801176))
        make_face()
    extrude(amount=-F23_DEPTH, mode=Mode.SUBTRACT)


solid = f1.part
